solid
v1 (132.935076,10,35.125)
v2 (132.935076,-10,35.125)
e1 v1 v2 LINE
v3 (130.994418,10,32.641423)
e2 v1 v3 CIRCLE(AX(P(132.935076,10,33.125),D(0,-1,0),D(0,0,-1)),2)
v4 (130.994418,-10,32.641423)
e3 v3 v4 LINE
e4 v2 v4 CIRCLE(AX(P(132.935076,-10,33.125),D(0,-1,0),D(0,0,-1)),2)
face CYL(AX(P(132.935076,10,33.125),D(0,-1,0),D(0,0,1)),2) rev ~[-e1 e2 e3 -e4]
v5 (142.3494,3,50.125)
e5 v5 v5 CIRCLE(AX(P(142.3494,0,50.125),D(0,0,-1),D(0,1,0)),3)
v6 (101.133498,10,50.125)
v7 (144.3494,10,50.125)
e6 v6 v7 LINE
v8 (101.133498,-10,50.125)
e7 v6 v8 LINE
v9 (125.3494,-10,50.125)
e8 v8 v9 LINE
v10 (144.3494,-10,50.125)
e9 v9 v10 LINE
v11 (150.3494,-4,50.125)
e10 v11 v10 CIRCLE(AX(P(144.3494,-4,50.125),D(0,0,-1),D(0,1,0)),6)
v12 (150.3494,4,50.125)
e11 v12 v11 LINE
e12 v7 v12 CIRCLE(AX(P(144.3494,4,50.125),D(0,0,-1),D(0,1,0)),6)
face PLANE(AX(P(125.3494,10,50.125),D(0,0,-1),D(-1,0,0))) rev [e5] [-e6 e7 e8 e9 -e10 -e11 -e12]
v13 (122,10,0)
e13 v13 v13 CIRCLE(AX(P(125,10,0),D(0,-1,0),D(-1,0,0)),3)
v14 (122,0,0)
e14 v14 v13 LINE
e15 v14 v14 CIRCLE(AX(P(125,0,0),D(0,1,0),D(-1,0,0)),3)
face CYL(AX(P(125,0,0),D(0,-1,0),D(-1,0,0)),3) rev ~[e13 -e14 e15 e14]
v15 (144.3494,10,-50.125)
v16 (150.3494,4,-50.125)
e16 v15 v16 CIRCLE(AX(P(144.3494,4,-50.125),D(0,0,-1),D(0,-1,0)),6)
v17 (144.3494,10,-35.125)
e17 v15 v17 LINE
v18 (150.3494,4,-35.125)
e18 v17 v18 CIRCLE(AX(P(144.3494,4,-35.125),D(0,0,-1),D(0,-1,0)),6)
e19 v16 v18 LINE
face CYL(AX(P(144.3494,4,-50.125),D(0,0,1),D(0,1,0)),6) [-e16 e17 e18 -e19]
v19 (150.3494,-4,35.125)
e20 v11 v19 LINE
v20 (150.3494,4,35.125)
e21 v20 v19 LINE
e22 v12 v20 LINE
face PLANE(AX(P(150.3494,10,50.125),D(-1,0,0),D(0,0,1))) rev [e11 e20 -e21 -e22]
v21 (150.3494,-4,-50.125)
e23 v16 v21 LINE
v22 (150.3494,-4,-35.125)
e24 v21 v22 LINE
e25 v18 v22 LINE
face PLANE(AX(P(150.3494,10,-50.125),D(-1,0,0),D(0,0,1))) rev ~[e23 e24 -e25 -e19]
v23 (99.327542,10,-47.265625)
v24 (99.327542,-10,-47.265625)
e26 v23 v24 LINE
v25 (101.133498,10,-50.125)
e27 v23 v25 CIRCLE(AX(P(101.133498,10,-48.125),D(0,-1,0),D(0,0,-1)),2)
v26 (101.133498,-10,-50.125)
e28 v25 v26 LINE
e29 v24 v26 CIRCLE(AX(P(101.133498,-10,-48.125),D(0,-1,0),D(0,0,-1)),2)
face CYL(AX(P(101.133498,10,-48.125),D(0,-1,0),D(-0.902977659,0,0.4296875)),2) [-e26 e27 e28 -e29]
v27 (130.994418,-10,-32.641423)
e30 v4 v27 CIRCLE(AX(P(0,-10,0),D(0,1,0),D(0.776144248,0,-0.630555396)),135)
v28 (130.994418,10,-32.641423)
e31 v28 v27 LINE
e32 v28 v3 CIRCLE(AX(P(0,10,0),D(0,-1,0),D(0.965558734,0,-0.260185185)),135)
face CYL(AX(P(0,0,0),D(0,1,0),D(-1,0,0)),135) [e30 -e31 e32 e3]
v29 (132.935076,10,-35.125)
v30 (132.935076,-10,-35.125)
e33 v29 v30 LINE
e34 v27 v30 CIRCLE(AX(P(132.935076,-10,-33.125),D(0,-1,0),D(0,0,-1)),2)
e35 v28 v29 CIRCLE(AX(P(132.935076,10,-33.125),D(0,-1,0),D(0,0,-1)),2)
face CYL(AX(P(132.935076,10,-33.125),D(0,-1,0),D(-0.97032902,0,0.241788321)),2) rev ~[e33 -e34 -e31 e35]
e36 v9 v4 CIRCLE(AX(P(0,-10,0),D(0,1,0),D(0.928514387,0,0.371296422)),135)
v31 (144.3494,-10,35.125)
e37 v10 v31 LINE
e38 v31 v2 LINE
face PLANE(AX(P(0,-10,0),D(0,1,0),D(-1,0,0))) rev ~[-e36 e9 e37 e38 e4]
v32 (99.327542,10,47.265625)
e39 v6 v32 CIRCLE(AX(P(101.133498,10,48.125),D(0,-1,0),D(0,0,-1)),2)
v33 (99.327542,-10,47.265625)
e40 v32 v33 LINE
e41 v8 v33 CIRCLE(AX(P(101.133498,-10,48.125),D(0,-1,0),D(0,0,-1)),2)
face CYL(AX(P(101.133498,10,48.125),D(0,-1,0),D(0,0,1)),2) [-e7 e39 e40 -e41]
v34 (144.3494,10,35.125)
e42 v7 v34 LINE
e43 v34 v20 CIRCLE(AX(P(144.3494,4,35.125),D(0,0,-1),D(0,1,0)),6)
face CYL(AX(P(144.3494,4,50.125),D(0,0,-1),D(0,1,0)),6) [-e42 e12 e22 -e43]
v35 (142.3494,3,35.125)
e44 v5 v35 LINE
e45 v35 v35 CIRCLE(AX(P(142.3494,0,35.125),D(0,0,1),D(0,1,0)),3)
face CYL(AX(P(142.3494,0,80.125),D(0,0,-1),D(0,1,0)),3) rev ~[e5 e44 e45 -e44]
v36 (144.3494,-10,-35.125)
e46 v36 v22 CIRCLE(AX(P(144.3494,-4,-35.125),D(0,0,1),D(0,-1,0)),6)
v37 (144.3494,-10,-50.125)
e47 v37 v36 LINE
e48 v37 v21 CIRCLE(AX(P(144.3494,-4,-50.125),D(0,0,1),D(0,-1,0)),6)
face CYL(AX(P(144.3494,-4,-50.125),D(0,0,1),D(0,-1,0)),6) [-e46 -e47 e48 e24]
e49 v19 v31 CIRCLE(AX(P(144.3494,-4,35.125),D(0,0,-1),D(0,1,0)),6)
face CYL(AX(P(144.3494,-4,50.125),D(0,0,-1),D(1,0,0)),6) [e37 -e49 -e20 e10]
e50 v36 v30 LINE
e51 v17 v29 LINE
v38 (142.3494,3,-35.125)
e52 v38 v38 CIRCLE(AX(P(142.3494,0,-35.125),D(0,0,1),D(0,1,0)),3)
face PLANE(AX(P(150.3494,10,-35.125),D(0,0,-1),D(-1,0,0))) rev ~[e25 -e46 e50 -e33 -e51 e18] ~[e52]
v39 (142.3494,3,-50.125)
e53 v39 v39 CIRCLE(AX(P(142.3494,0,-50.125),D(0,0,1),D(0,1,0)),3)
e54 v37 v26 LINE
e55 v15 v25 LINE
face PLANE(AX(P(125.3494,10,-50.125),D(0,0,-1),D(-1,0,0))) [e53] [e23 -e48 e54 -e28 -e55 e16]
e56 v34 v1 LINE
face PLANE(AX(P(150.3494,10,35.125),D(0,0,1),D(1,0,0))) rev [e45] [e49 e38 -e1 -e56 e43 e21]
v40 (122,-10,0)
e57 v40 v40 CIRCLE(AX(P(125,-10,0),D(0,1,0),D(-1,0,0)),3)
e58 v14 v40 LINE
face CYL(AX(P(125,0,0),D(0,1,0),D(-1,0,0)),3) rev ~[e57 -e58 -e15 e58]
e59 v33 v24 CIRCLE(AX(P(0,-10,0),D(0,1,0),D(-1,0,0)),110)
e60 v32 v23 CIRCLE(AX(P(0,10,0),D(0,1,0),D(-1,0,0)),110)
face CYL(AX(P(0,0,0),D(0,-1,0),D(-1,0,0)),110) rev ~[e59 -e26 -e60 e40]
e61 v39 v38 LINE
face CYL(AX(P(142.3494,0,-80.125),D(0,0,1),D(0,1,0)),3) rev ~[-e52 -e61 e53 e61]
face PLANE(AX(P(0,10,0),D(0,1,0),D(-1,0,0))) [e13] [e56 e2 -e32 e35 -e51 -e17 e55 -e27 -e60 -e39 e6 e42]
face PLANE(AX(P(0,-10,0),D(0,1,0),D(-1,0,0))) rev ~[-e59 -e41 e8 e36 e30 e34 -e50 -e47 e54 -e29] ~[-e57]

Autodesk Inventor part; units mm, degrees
ref_plane "YZ Plane" through (0, 0, 0) normal (1, 0, 0) x (0, 1, 0)
ref_plane "XZ Plane" through (0, 0, 0) normal (0, 1, 0) x (-1, 0, 0)
ref_plane "XY Plane" through (0, 0, 0) normal (0, 0, 1) x (1, 0, 0)
sketch "Sketch1" plane through (0, 0, 0) normal (0, 1, 0) x (-1, 0, 0)
  circle A0 centre (0, 0) radius 135
  circle A1 centre (0, 0) radius 110
  circle A2 centre (0, 0) radius 125
  circle A3 centre (-125, 0) radius 3
  circle A4 centre (-101.1271, -73.4732) radius 3
  circle A5 centre (-38.6271, -118.8821) radius 3
  circle A6 centre (38.6271, -118.8821) radius 3
  circle A7 centre (101.1271, -73.4732) radius 3
  circle A8 centre (125, 0) radius 3
  circle A9 centre (101.1271, 73.4732) radius 3
  circle A10 centre (38.6271, 118.8821) radius 3
  circle A11 centre (-38.6271, 118.8821) radius 3
  circle A12 centre (-101.1271, 73.4732) radius 3
  dimension "d68" = 250
  dimension "d0" = 270
  dimension "d1" = 220
  dimension "d74" = 6
  dimension "d77" = 360
extrude "Extrusion1" add sketch "Sketch1" along normal mid plane 20 contours A0 | A8 A2 A7 A6 A5 A4 A3 A12 A11 A10 A9
sketch "Sketch4" plane through (0, 10, 0) normal (0, 1, 0) x (1, 0, 0)
  circle A0 centre (0, 0) radius 50.125
  circle A1 centre (0, 0) radius 135 projected
  circle A2 centre (0, 0) radius 110 projected
  line L0 (125.3494, 50.125) -> (150.3494, 50.125)
  line L1 (150.3494, 50.125) -> (150.3494, 35.125)
  line L2 (150.3494, 35.125) -> (125.3494, 35.125)
  line L3 (125.3494, 35.125) -> (125.3494, 50.125)
  line L4 (150.3494, 70.125) -> (104.7795, 70.125)
  line L5 (104.7795, 70.125) -> (104.7795, 85.125)
  line L6 (104.7795, 85.125) -> (150.3494, 85.125)
  line L7 (150.3494, 85.125) -> (150.3494, 70.125)
  line L8 (103.1497, 60.125) -> (138.3886, 60.125) construction
  point P0 (130.3504, 35.125)
  point P1 (115.3581, 70.125)
  dimension "d21" = 100.25
  dimension "d22" = 25
  dimension "d23" = 15
  dimension "d24" = 20
  dimension "d25" = 15
  dimension "d57" = 10
extrude "Extrusion3" add sketch "Sketch4" against normal up to surface (20 mm away) contours L6 L7 L4 A1 | A1 L0 L1 L2
fillet "Fillet1" radius 6 4 edges at (150.3494, 10, -77.625) (150.3494, -10, -77.625) (150.3494, -10, -42.625) (150.3494, 10, -42.625)
fillet "Fillet2" radius 10 1 edges at (104.7795, 0, -85.125)
fillet "Fillet3" radius 2 1 edges at (130.3504, 0, -35.125)
sketch "Sketch5" plane through (150.3494, -4, -85.125) normal (0, 0, -1) x (-1, 0, 0)
  line L0 (0, 8) -> (0, 0) projected
  line L1 (40.9135, -6) -> (6, -6) projected
  point P0 (150.3494, 4)
  point P1 (8, 4)
  point P2 (0, 4)
  dimension "d38" = 8
  dimension "d39" = 10
hole "Hole2" at (142.3494, 0, -85.125) direction (0, 0, 1) diameter 6 depth 50 counterbore diameter 8.8 counterbore depth 5
mirror "Mirror1" about plane through (0, 0, 0) normal (1, 0, 0) of "Extrusion3", "Fillet1", "Fillet2", "Fillet3", "Hole2"
mirror "Mirror2" about plane through (0, 0, 0) normal (0, 0, 1) of "Extrusion3", "Fillet1", "Fillet2", "Fillet3", "Hole2"
sketch "Sketch7" plane through (0, 10, 0) normal (0, 1, 0) x (1, 0, 0)
  line L0 (0, 0) -> (0, -158.0698) construction
  point P0 (0, -127.5)
  dimension "d50" = 127.5
hole "Hole3" at (0, 10, 127.5) direction (0, -1, 0) diameter 5 end through all
sketch "Sketch10" plane through (0, 10, 0) normal (0, 1, 0) x (1, 0, 0)
  line L0 (144.3494, 50.125) -> (125.3494, 50.125) projected
  line L1 (144.3494, -50.125) -> (125.3494, -50.125) projected
  line L2 (174.7146, 50.125) -> (75.699, 50.125)
  line L3 (75.699, 50.125) -> (75.699, -50.125)
  line L4 (75.699, -50.125) -> (174.7146, -50.125)
  line L5 (174.7146, 145.3293) -> (-157.7861, 145.3293)
  line L6 (-157.7861, 145.3293) -> (-157.7861, -141.1771)
  line L7 (-157.7861, -141.1771) -> (174.7146, -141.1771)
  line L8 (174.7146, -141.1771) -> (174.7146, -50.125)
  line L9 (174.7146, 50.125) -> (174.7146, 145.3293)
  point P0 (0, 0)
extrude "Extrusion7" cut sketch "Sketch10" against normal through all
fillet "Fillet7" radius 2 2 edges at (97.9157, 0, -50.125) (97.9157, 0, 50.125)
properties part number "Cylinder 80-20 Spacer_1"
